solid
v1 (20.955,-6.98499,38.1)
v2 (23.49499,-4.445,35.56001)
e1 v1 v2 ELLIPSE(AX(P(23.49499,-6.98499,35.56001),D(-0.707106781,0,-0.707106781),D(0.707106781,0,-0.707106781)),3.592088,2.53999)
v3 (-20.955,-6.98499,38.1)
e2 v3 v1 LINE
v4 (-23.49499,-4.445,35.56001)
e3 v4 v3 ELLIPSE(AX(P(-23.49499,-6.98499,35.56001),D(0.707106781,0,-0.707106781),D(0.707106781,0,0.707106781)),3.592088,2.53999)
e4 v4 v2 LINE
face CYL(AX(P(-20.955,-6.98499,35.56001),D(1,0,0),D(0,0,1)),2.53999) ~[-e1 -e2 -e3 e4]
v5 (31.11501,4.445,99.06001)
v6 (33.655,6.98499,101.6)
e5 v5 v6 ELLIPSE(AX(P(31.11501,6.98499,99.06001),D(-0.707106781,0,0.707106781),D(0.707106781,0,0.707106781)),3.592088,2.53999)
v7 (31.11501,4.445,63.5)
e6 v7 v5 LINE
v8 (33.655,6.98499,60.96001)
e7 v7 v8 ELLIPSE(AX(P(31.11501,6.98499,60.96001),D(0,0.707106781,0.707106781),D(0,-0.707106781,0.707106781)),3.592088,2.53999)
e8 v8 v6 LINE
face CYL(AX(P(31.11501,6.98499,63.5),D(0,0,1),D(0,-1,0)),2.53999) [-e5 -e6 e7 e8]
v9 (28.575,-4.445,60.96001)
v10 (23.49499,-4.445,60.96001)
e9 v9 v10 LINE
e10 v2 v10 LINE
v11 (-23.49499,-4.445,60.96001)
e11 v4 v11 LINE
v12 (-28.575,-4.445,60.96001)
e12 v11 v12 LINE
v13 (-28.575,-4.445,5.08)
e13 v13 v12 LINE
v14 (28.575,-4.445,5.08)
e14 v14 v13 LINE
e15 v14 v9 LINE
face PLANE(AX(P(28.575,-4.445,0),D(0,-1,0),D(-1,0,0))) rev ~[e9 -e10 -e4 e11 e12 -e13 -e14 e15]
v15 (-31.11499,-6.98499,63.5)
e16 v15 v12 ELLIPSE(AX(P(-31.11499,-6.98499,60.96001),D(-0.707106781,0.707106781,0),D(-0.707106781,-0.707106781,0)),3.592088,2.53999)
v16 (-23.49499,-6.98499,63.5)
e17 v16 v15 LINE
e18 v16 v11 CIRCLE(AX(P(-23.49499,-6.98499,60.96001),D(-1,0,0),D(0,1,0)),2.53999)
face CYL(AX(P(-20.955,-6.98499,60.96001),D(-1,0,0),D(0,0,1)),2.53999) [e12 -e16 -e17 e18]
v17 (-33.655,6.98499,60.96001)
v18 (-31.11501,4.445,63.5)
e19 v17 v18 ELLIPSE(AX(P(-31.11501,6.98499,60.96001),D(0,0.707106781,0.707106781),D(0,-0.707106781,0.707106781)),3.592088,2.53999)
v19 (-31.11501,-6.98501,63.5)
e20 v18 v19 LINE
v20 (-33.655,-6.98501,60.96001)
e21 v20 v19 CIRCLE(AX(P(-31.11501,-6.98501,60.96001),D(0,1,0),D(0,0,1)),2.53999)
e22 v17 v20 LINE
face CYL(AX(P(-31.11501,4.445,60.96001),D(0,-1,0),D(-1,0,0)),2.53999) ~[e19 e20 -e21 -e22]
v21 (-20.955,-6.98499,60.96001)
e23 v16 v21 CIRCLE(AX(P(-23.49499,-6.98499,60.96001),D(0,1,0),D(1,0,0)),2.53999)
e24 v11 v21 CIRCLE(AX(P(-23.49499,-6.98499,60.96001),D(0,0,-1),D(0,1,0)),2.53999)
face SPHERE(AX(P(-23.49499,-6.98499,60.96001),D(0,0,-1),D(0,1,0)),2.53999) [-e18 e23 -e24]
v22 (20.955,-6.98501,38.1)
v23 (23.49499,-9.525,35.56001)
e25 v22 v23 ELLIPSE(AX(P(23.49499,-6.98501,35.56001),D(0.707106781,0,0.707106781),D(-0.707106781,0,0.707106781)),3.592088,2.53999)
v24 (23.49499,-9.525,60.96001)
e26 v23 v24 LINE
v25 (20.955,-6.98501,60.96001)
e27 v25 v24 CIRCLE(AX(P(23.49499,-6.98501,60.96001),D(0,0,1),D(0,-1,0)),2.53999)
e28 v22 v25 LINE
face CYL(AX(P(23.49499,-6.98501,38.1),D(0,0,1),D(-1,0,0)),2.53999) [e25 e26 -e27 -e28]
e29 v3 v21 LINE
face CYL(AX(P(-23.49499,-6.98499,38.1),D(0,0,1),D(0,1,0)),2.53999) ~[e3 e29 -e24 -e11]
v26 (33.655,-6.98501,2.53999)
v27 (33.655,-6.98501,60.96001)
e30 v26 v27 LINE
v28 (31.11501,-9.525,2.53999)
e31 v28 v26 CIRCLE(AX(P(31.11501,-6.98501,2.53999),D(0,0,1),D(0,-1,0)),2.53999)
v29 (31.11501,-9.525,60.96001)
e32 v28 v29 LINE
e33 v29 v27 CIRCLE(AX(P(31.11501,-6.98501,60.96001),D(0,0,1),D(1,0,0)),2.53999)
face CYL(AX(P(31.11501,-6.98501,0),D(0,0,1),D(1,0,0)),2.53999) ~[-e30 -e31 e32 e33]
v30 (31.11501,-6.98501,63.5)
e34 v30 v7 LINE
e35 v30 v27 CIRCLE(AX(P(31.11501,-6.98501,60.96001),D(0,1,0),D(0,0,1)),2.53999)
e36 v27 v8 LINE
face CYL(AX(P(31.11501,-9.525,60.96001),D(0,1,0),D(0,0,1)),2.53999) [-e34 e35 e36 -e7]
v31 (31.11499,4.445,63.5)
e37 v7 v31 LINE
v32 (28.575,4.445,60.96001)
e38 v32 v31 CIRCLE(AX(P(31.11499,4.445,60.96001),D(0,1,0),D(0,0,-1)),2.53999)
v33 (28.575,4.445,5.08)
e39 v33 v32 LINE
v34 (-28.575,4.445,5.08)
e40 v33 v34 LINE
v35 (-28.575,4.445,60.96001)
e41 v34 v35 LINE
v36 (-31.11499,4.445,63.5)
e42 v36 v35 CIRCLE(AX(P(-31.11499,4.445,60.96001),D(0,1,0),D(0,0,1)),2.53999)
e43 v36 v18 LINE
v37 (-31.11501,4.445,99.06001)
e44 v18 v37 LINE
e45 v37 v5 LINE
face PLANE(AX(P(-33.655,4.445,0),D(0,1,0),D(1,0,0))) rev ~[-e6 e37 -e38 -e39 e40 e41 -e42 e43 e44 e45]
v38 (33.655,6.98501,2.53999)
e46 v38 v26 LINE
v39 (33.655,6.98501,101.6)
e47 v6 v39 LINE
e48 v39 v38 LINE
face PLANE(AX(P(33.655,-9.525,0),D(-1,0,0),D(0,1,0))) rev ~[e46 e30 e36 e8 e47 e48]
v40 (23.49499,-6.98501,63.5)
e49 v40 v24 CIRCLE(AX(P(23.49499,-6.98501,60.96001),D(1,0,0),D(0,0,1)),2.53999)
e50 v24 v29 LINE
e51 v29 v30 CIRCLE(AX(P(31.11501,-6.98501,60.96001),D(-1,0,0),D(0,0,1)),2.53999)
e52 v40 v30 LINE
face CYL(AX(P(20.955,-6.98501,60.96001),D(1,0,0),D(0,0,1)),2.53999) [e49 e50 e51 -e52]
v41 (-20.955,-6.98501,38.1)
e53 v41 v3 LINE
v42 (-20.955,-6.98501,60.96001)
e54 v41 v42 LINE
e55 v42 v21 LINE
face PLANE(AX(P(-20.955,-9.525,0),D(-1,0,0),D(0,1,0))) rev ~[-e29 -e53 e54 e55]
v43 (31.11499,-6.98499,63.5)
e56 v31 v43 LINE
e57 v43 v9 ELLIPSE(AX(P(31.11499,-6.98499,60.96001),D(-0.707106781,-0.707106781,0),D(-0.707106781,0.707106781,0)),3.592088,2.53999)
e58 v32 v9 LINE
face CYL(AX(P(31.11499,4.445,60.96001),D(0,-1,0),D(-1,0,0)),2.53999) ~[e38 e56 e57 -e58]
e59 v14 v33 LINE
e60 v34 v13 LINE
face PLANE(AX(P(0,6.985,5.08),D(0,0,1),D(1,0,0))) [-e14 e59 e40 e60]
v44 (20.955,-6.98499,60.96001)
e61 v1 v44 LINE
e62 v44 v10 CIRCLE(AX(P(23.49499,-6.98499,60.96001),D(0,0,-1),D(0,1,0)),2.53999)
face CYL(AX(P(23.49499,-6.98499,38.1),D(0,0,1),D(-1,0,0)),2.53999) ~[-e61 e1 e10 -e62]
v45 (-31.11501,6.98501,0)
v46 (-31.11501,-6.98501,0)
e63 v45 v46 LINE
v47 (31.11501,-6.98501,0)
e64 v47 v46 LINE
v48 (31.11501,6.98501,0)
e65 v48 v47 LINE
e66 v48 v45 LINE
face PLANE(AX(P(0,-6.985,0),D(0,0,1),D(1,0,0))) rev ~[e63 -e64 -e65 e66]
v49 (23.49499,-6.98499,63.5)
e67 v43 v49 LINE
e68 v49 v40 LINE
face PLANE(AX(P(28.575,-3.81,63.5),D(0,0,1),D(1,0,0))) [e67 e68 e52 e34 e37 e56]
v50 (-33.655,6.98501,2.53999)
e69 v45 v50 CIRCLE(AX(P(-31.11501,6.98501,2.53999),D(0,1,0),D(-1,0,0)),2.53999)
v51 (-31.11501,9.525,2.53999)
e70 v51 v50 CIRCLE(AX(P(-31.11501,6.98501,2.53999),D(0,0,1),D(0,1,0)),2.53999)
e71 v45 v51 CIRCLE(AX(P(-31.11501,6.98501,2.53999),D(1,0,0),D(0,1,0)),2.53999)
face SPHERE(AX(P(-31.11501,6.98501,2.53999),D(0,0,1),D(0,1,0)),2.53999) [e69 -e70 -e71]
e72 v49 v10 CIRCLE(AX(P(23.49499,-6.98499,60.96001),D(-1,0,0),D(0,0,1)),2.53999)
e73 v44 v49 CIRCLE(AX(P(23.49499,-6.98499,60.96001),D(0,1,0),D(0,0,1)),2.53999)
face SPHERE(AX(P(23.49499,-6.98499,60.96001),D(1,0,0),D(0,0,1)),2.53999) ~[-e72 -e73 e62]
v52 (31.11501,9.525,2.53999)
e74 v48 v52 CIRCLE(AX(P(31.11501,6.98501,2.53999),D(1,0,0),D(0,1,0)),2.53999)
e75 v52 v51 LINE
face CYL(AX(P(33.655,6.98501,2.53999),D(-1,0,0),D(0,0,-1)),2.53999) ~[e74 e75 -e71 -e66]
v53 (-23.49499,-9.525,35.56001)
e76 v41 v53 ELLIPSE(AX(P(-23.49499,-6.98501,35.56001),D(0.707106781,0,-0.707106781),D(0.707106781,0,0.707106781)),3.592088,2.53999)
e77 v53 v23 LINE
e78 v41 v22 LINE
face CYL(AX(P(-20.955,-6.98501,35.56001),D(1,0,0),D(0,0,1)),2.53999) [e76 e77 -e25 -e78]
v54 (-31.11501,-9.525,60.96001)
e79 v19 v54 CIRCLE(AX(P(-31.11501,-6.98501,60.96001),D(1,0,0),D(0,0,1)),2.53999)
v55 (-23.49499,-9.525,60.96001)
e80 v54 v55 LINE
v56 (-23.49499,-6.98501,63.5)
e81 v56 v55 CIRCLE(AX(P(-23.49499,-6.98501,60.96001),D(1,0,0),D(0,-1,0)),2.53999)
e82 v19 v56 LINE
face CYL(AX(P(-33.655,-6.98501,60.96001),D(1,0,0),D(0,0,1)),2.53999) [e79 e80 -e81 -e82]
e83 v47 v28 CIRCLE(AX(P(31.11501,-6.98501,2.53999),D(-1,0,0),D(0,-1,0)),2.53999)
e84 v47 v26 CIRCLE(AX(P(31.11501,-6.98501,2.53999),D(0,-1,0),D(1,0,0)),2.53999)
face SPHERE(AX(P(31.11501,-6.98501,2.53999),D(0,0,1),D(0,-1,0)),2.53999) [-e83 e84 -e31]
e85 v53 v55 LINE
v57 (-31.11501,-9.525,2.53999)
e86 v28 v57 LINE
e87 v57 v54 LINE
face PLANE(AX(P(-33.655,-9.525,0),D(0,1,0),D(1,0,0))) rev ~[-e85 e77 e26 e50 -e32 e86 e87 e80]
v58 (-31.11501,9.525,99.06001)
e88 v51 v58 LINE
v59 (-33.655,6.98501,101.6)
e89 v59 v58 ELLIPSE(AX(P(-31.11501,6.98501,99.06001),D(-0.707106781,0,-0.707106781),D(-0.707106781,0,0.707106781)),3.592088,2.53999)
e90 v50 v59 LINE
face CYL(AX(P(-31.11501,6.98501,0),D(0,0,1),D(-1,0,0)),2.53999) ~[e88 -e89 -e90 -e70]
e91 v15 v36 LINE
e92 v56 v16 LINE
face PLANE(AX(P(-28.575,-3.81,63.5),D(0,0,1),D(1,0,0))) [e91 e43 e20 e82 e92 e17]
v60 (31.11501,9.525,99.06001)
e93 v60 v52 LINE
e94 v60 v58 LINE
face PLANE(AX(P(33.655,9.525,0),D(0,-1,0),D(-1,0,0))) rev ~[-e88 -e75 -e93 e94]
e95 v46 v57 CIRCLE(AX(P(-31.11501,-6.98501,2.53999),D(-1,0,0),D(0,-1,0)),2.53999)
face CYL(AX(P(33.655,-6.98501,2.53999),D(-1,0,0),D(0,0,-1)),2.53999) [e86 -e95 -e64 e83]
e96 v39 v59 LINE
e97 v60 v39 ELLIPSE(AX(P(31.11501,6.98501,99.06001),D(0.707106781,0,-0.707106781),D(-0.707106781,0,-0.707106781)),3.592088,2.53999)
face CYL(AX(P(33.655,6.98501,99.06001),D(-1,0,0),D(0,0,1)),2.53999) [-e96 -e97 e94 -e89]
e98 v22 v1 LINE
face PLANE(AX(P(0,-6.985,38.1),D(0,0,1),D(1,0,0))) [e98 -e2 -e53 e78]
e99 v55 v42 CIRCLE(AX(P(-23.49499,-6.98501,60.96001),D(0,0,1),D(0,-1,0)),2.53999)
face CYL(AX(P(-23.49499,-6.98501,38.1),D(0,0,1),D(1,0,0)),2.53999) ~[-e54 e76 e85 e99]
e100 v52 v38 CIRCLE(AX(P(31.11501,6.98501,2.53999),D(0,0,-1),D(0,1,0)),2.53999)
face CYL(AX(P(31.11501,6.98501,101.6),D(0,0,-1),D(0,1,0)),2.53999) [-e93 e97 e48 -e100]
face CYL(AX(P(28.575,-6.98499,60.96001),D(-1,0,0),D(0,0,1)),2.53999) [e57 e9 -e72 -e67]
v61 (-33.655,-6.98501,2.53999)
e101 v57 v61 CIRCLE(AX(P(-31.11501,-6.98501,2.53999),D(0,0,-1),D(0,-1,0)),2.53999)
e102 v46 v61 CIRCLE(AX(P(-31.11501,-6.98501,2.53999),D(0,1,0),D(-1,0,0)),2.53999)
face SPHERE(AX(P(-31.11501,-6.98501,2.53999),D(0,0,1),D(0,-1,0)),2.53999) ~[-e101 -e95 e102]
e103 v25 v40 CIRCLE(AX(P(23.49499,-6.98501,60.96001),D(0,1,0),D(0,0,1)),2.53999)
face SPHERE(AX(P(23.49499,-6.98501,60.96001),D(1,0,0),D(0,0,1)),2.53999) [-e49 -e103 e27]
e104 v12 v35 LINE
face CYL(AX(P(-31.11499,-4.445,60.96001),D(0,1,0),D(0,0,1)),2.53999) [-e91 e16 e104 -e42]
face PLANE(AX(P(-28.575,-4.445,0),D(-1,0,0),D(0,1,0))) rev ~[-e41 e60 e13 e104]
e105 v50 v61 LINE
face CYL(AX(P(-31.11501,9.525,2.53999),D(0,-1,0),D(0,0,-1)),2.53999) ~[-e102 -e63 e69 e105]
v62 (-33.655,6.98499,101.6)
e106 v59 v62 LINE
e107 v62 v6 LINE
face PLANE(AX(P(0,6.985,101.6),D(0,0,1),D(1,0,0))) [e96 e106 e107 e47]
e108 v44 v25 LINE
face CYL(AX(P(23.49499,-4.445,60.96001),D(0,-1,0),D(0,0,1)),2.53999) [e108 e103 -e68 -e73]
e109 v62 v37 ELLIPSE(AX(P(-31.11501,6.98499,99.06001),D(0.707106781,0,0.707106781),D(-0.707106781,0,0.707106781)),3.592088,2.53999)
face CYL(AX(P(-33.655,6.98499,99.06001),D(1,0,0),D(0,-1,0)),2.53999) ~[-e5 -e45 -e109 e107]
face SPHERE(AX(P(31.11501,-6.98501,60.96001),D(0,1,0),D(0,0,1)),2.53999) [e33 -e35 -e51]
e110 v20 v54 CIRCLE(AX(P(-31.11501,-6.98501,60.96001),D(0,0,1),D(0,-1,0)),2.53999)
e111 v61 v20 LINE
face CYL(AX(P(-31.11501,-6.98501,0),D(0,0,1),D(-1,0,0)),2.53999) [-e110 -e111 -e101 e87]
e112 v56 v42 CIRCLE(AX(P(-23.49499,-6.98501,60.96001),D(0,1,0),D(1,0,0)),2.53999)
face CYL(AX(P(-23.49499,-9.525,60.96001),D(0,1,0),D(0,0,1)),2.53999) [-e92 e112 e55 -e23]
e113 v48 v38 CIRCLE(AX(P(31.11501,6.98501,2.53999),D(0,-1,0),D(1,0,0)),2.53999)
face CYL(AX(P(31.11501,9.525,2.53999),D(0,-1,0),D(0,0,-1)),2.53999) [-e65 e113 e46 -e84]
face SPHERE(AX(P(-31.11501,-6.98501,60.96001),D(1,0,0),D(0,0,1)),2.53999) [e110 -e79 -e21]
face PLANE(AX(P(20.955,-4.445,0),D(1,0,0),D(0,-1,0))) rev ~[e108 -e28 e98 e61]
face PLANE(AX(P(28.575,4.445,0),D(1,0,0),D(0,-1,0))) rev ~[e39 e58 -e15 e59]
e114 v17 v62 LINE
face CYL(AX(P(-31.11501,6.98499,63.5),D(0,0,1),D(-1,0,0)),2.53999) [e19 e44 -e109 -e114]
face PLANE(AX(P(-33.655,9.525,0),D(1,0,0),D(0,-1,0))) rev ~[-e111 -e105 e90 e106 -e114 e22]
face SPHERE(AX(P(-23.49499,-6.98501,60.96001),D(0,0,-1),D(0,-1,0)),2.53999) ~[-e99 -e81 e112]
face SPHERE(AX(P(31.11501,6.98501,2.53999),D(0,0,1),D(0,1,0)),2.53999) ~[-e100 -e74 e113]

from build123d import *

# Parameters (mm, degrees)
F0_W     = 41.91
F0_H     = 5.08
F1_DEPTH = 5.08
F2_DEPTH = 101.6
F3_DEPTH = 63.5
F4_DEPTH = 38.1
F5_R     = 2.53999


# Not quite as in the source:
# - a fillet or chamfer is up to 0.001 mm smaller than in the source, because OpenCascade refuses the exact size


with BuildPart() as f1:
    # F0 (on Top) → F1 (new body)
    with BuildSketch(Plane.XY):
        Polygon((33.655, 9.525), (-33.655, 9.525), (-33.655, 4.445), (-28.575, 4.445), (28.575, 4.445), (33.655, 4.445), align=None)
        Polygon((-28.575, 4.445), (-33.655, 4.445), (-33.655, -9.525), (-20.955, -9.525), (-20.955, -4.445), (-28.575, -4.445), align=None)
        Polygon((33.655, -9.525), (33.655, 4.445), (28.575, 4.445), (28.575, -4.445), (20.955, -4.445), (20.955, -9.525), align=None)
        with Locations((0, -6.985)):
            Rectangle(F0_W, F0_H)
        Polygon((28.575, 4.445), (-28.575, 4.445), (-28.575, -4.445), (-20.955, -4.445), (20.955, -4.445), (28.575, -4.445), align=None)
    extrude(amount=F1_DEPTH)

    # F0 (on Top) → F2 (join)
    with BuildSketch(Plane.XY):
        Polygon((33.655, 9.525), (-33.655, 9.525), (-33.655, 4.445), (-28.575, 4.445), (28.575, 4.445), (33.655, 4.445), align=None)
    extrude(amount=F2_DEPTH)

    # F0 (on Top) → F3 (join)
    with BuildSketch(Plane.XY):
        Polygon((-28.575, 4.445), (-33.655, 4.445), (-33.655, -9.525), (-20.955, -9.525), (-20.955, -4.445), (-28.575, -4.445), align=None)
        Polygon((33.655, -9.525), (33.655, 4.445), (28.575, 4.445), (28.575, -4.445), (20.955, -4.445), (20.955, -9.525), align=None)
    extrude(amount=F3_DEPTH)

    # F0 (on Top) → F4 (join)
    with BuildSketch(Plane.XY):
        with Locations((0, -6.985)):
            Rectangle(F0_W, F0_H)
    extrude(amount=F4_DEPTH)

    # F5 (radius 2.54 in the source; OpenCascade refuses exactly that, so slightly less here)
    f5_edges = [f1.edges().sort_by_distance(p)[0] for p in [
        (-33.655, 4.445, 82.55),
        (33.655, 9.525, 50.8),
        (33.655, 4.445, 82.55),
        (0, 4.445, 101.6),
        (0, 9.525, 101.6),
        (-33.655, 9.525, 50.8),
        (0, 9.525, 0),
        (33.655, -2.54, 63.5),
        (24.765, -4.445, 63.5),
        (28.575, 0, 63.5),
        (27.305, -9.525, 63.5),
        (20.955, -6.985, 63.5),
        (33.655, -9.525, 31.75),
        (20.955, -9.525, 50.8),
        (0, -9.525, 38.1),
        (-20.955, -9.525, 50.8),
        (-20.955, -4.445, 50.8),
        (-27.305, -9.525, 63.5),
        (-24.765, -4.445, 63.5),
        (-28.575, 0, 63.5),
        (-33.655, -2.54, 63.5),
        (-33.655, -9.525, 31.75),
        (0, -9.525, 0),
        (33.655, 0, 0),
        (-33.655, 0, 0),
        (-20.955, -6.985, 63.5),
        (0, -4.445, 38.1),
        (20.955, -4.445, 50.8),
    ]]
    fillet(f5_edges, radius=F5_R)


solid = f1.part
